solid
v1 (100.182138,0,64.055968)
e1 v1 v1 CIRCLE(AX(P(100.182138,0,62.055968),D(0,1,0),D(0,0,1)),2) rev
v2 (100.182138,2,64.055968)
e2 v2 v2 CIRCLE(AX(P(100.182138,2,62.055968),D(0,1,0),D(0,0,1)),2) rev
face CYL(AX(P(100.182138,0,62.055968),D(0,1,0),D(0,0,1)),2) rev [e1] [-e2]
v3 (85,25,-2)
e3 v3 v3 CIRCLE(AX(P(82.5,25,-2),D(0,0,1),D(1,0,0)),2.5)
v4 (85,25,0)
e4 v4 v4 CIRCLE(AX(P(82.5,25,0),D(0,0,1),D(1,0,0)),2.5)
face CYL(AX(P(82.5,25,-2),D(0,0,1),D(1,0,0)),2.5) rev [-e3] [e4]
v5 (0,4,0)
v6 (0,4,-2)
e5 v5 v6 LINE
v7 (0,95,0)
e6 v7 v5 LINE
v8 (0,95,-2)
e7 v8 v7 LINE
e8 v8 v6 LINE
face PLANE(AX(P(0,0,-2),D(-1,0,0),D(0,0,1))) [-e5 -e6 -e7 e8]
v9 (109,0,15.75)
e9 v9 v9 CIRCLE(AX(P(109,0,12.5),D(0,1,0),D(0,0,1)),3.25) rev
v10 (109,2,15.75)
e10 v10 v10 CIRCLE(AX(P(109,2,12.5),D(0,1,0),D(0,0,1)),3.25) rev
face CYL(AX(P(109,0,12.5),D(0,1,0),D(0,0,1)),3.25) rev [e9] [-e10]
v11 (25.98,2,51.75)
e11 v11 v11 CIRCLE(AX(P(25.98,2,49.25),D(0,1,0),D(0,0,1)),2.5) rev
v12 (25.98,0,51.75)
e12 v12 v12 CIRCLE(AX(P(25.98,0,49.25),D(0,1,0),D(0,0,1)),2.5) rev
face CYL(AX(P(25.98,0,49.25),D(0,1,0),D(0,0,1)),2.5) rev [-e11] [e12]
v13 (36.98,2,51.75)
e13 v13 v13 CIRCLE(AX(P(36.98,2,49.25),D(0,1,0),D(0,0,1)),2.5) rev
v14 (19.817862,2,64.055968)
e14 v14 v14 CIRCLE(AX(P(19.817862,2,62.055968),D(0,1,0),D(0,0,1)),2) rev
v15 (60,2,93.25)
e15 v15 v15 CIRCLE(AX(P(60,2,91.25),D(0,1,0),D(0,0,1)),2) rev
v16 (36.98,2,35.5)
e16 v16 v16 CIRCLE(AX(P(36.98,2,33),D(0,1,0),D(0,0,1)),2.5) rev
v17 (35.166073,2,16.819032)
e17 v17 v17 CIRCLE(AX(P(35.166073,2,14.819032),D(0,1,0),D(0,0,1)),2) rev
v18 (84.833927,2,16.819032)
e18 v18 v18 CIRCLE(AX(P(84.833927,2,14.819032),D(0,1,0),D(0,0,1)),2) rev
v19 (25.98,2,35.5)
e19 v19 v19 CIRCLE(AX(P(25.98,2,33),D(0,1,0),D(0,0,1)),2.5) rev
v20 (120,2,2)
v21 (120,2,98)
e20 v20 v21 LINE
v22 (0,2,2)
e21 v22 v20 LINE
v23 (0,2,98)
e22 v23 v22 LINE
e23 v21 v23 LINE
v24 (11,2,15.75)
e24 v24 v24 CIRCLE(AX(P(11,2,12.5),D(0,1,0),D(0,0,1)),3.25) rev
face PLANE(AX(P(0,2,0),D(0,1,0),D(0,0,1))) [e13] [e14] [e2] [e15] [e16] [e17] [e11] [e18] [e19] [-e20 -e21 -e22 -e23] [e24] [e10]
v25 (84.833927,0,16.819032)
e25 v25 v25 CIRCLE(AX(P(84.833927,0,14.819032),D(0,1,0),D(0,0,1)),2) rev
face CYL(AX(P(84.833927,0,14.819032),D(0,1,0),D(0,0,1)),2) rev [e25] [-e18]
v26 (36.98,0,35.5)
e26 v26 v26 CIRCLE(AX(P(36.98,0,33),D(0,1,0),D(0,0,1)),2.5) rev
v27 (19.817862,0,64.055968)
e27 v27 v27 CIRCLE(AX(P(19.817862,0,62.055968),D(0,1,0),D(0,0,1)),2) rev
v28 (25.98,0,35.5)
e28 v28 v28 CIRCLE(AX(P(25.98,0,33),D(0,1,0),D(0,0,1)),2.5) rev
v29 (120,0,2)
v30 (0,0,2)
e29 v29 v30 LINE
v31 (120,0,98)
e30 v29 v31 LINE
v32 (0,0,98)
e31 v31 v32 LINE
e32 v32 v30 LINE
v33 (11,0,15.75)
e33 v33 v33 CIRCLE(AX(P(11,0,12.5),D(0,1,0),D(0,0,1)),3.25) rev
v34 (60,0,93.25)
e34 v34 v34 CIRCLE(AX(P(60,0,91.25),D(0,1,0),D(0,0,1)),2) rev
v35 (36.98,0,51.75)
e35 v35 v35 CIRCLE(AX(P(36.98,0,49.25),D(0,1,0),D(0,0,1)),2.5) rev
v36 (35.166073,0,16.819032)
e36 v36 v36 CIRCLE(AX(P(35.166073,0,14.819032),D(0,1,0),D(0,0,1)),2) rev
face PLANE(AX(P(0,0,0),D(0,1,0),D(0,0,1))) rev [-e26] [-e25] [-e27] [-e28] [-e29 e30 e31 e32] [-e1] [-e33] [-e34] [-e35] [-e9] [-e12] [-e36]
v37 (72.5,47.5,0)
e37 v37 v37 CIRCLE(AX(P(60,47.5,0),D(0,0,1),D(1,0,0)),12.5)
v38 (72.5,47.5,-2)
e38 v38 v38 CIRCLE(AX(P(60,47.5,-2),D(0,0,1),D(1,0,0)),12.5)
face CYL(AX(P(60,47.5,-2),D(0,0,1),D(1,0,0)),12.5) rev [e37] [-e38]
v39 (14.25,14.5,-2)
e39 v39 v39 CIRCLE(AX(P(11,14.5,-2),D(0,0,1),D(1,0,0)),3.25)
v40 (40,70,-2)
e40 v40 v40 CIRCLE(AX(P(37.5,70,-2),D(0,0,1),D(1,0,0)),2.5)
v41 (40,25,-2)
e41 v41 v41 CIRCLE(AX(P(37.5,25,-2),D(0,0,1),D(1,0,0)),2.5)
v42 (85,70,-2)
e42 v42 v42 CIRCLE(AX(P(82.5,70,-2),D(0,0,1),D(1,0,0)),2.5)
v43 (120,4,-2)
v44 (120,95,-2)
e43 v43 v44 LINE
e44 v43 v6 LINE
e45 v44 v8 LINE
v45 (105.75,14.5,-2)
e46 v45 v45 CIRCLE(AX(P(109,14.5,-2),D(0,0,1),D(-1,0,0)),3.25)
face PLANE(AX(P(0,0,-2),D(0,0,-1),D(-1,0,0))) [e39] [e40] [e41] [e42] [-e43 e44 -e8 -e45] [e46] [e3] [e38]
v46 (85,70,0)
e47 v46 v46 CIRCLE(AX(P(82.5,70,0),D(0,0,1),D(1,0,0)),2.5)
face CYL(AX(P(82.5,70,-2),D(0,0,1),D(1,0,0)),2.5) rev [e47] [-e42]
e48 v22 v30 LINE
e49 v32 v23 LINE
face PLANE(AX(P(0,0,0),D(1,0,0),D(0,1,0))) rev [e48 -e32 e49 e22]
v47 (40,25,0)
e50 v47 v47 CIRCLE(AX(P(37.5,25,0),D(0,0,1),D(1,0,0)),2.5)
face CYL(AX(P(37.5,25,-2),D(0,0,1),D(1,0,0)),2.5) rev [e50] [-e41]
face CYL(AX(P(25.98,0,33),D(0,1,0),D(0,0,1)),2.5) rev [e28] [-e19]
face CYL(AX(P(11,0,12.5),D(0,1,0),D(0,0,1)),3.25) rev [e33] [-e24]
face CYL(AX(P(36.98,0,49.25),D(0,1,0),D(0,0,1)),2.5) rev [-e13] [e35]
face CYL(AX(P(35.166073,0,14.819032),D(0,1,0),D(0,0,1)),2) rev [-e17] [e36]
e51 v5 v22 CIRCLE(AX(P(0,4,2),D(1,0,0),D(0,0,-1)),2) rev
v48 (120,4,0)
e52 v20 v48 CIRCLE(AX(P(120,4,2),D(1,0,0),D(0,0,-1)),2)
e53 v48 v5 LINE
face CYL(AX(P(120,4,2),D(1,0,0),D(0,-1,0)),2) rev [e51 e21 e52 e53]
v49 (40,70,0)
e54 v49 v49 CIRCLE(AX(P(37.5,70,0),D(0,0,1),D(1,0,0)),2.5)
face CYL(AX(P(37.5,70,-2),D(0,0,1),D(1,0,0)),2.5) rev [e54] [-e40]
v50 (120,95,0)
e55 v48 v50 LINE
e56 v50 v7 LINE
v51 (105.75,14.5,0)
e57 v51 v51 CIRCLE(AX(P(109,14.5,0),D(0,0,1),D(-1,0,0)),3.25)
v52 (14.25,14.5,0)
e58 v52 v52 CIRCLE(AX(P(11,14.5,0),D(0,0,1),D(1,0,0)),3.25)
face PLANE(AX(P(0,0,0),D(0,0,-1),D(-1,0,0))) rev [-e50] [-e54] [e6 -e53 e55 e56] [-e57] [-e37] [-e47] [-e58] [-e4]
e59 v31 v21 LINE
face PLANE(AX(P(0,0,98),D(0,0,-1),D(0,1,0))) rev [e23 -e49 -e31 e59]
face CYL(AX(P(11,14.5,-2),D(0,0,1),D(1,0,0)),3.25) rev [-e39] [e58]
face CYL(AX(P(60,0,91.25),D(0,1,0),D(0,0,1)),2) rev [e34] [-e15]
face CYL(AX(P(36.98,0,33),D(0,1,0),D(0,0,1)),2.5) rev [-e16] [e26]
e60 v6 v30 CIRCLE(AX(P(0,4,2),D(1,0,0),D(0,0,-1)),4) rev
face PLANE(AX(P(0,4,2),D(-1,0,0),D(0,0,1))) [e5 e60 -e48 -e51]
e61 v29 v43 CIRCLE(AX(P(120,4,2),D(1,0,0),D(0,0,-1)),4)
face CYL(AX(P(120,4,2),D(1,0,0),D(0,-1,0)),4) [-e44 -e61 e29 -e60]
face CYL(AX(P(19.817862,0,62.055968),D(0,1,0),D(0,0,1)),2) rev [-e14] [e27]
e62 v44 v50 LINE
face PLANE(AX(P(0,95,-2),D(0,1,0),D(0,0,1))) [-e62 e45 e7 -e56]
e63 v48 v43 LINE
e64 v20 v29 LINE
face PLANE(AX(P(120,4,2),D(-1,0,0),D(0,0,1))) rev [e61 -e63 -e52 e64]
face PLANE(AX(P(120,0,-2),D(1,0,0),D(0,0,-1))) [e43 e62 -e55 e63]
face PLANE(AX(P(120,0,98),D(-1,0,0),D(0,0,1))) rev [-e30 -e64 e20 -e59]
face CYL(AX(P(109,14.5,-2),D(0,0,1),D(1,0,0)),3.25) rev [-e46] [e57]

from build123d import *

# Parameters (mm, degrees)
SKETCH2_W                    = 120
SKETCH2_H                    = 95
SKETCH2_R                    = 12.5
SKETCH2_R_2                  = 2.5
SKETCH2_R_3                  = 3.25
BASE_FLANGE1_DEPTH           = 2
EDGE_FLANGE1_STRIP_W         = 12
EDGE_FLANGE1_STRIP_H         = 2
EDGE_FLANGE1_STRIP_CUT_DEPTH = 120
EDGE_FLANGE1_DEPTH           = 120
EDGE_FLANGE1_PROFILE_W       = 120
EDGE_FLANGE1_PROFILE_H       = 96
EDGE_FLANGE1_PROFILE_R       = 3.25
EDGE_FLANGE1_PROFILE_R_2     = 2
EDGE_FLANGE1_PROFILE_R_3     = 2.5
EDGE_FLANGE1_FLAT_DEPTH      = 2


# Sheet-metal steps are written as plain solids
with BuildPart() as part:
    # Sketch2 → Base-Flange1 (new body)
    with BuildSketch(Plane.XY):
        with Locations((60, 47.5)):
            Rectangle(SKETCH2_W, SKETCH2_H)
        with Locations((60, 47.5)):
            Circle(SKETCH2_R, mode=Mode.SUBTRACT)
        with Locations((82.5, 70)):
            Circle(SKETCH2_R_2, mode=Mode.SUBTRACT)
        with Locations((37.5, 70)):
            Circle(SKETCH2_R_2, mode=Mode.SUBTRACT)
        with Locations((37.5, 25)):
            Circle(SKETCH2_R_2, mode=Mode.SUBTRACT)
        with Locations((82.5, 25)):
            Circle(SKETCH2_R_2, mode=Mode.SUBTRACT)
        with Locations((11, 14.5)):
            Circle(SKETCH2_R_3, mode=Mode.SUBTRACT)
        with Locations(Location((109, 14.5, 0), (0, 0, 180))):
            Circle(SKETCH2_R_3, mode=Mode.SUBTRACT)
    extrude(amount=-BASE_FLANGE1_DEPTH)

    # Edge-Flange1 strip (across the edge) → Edge-Flange1 strip cut (cut)
    with BuildSketch(Plane.YZ):
        with Locations((-2, -1)):
            Rectangle(EDGE_FLANGE1_STRIP_W, EDGE_FLANGE1_STRIP_H)
    extrude(amount=EDGE_FLANGE1_STRIP_CUT_DEPTH, mode=Mode.SUBTRACT)

    # Edge-Flange1 bend section (across the edge) → Edge-Flange1 (add)
    with BuildSketch(Plane.YZ):
        with BuildLine():
            Line((0, 2), (2, 2))
            ThreePointArc((2, 2), (2.585786438, 0.585786438), (4, 0))
            Line((4, 0), (4, -2))
            ThreePointArc((4, -2), (1.171572875, -0.828427125), (0, 2))
        make_face()
    extrude(amount=EDGE_FLANGE1_DEPTH)

    # Edge-Flange1 profile (on flange) → Edge-Flange1 flat (add)
    with BuildSketch(Plane.XZ):
        with Locations((60, 50)):
            Rectangle(EDGE_FLANGE1_PROFILE_W, EDGE_FLANGE1_PROFILE_H)
        with Locations((11, 12.5)):
            Circle(EDGE_FLANGE1_PROFILE_R, mode=Mode.SUBTRACT)
        with Locations((35.166073091, 14.819031988)):
            Circle(EDGE_FLANGE1_PROFILE_R_2, mode=Mode.SUBTRACT)
        with Locations((25.98, 33)):
            Circle(EDGE_FLANGE1_PROFILE_R_3, mode=Mode.SUBTRACT)
        with Locations((25.98, 49.25)):
            Circle(EDGE_FLANGE1_PROFILE_R_3, mode=Mode.SUBTRACT)
        with Locations((36.98, 33)):
            Circle(EDGE_FLANGE1_PROFILE_R_3, mode=Mode.SUBTRACT)
        with Locations((36.98, 49.25)):
            Circle(EDGE_FLANGE1_PROFILE_R_3, mode=Mode.SUBTRACT)
        with Locations((84.833926909, 14.819031988)):
            Circle(EDGE_FLANGE1_PROFILE_R_2, mode=Mode.SUBTRACT)
        with Locations((109, 12.5)):
            Circle(EDGE_FLANGE1_PROFILE_R, mode=Mode.SUBTRACT)
        with Locations((19.817862187, 62.055968012)):
            Circle(EDGE_FLANGE1_PROFILE_R_2, mode=Mode.SUBTRACT)
        with Locations((100.182137813, 62.055968012)):
            Circle(EDGE_FLANGE1_PROFILE_R_2, mode=Mode.SUBTRACT)
        with Locations((60, 91.25)):
            Circle(EDGE_FLANGE1_PROFILE_R_2, mode=Mode.SUBTRACT)
    extrude(amount=-EDGE_FLANGE1_FLAT_DEPTH)


solid = part.part
